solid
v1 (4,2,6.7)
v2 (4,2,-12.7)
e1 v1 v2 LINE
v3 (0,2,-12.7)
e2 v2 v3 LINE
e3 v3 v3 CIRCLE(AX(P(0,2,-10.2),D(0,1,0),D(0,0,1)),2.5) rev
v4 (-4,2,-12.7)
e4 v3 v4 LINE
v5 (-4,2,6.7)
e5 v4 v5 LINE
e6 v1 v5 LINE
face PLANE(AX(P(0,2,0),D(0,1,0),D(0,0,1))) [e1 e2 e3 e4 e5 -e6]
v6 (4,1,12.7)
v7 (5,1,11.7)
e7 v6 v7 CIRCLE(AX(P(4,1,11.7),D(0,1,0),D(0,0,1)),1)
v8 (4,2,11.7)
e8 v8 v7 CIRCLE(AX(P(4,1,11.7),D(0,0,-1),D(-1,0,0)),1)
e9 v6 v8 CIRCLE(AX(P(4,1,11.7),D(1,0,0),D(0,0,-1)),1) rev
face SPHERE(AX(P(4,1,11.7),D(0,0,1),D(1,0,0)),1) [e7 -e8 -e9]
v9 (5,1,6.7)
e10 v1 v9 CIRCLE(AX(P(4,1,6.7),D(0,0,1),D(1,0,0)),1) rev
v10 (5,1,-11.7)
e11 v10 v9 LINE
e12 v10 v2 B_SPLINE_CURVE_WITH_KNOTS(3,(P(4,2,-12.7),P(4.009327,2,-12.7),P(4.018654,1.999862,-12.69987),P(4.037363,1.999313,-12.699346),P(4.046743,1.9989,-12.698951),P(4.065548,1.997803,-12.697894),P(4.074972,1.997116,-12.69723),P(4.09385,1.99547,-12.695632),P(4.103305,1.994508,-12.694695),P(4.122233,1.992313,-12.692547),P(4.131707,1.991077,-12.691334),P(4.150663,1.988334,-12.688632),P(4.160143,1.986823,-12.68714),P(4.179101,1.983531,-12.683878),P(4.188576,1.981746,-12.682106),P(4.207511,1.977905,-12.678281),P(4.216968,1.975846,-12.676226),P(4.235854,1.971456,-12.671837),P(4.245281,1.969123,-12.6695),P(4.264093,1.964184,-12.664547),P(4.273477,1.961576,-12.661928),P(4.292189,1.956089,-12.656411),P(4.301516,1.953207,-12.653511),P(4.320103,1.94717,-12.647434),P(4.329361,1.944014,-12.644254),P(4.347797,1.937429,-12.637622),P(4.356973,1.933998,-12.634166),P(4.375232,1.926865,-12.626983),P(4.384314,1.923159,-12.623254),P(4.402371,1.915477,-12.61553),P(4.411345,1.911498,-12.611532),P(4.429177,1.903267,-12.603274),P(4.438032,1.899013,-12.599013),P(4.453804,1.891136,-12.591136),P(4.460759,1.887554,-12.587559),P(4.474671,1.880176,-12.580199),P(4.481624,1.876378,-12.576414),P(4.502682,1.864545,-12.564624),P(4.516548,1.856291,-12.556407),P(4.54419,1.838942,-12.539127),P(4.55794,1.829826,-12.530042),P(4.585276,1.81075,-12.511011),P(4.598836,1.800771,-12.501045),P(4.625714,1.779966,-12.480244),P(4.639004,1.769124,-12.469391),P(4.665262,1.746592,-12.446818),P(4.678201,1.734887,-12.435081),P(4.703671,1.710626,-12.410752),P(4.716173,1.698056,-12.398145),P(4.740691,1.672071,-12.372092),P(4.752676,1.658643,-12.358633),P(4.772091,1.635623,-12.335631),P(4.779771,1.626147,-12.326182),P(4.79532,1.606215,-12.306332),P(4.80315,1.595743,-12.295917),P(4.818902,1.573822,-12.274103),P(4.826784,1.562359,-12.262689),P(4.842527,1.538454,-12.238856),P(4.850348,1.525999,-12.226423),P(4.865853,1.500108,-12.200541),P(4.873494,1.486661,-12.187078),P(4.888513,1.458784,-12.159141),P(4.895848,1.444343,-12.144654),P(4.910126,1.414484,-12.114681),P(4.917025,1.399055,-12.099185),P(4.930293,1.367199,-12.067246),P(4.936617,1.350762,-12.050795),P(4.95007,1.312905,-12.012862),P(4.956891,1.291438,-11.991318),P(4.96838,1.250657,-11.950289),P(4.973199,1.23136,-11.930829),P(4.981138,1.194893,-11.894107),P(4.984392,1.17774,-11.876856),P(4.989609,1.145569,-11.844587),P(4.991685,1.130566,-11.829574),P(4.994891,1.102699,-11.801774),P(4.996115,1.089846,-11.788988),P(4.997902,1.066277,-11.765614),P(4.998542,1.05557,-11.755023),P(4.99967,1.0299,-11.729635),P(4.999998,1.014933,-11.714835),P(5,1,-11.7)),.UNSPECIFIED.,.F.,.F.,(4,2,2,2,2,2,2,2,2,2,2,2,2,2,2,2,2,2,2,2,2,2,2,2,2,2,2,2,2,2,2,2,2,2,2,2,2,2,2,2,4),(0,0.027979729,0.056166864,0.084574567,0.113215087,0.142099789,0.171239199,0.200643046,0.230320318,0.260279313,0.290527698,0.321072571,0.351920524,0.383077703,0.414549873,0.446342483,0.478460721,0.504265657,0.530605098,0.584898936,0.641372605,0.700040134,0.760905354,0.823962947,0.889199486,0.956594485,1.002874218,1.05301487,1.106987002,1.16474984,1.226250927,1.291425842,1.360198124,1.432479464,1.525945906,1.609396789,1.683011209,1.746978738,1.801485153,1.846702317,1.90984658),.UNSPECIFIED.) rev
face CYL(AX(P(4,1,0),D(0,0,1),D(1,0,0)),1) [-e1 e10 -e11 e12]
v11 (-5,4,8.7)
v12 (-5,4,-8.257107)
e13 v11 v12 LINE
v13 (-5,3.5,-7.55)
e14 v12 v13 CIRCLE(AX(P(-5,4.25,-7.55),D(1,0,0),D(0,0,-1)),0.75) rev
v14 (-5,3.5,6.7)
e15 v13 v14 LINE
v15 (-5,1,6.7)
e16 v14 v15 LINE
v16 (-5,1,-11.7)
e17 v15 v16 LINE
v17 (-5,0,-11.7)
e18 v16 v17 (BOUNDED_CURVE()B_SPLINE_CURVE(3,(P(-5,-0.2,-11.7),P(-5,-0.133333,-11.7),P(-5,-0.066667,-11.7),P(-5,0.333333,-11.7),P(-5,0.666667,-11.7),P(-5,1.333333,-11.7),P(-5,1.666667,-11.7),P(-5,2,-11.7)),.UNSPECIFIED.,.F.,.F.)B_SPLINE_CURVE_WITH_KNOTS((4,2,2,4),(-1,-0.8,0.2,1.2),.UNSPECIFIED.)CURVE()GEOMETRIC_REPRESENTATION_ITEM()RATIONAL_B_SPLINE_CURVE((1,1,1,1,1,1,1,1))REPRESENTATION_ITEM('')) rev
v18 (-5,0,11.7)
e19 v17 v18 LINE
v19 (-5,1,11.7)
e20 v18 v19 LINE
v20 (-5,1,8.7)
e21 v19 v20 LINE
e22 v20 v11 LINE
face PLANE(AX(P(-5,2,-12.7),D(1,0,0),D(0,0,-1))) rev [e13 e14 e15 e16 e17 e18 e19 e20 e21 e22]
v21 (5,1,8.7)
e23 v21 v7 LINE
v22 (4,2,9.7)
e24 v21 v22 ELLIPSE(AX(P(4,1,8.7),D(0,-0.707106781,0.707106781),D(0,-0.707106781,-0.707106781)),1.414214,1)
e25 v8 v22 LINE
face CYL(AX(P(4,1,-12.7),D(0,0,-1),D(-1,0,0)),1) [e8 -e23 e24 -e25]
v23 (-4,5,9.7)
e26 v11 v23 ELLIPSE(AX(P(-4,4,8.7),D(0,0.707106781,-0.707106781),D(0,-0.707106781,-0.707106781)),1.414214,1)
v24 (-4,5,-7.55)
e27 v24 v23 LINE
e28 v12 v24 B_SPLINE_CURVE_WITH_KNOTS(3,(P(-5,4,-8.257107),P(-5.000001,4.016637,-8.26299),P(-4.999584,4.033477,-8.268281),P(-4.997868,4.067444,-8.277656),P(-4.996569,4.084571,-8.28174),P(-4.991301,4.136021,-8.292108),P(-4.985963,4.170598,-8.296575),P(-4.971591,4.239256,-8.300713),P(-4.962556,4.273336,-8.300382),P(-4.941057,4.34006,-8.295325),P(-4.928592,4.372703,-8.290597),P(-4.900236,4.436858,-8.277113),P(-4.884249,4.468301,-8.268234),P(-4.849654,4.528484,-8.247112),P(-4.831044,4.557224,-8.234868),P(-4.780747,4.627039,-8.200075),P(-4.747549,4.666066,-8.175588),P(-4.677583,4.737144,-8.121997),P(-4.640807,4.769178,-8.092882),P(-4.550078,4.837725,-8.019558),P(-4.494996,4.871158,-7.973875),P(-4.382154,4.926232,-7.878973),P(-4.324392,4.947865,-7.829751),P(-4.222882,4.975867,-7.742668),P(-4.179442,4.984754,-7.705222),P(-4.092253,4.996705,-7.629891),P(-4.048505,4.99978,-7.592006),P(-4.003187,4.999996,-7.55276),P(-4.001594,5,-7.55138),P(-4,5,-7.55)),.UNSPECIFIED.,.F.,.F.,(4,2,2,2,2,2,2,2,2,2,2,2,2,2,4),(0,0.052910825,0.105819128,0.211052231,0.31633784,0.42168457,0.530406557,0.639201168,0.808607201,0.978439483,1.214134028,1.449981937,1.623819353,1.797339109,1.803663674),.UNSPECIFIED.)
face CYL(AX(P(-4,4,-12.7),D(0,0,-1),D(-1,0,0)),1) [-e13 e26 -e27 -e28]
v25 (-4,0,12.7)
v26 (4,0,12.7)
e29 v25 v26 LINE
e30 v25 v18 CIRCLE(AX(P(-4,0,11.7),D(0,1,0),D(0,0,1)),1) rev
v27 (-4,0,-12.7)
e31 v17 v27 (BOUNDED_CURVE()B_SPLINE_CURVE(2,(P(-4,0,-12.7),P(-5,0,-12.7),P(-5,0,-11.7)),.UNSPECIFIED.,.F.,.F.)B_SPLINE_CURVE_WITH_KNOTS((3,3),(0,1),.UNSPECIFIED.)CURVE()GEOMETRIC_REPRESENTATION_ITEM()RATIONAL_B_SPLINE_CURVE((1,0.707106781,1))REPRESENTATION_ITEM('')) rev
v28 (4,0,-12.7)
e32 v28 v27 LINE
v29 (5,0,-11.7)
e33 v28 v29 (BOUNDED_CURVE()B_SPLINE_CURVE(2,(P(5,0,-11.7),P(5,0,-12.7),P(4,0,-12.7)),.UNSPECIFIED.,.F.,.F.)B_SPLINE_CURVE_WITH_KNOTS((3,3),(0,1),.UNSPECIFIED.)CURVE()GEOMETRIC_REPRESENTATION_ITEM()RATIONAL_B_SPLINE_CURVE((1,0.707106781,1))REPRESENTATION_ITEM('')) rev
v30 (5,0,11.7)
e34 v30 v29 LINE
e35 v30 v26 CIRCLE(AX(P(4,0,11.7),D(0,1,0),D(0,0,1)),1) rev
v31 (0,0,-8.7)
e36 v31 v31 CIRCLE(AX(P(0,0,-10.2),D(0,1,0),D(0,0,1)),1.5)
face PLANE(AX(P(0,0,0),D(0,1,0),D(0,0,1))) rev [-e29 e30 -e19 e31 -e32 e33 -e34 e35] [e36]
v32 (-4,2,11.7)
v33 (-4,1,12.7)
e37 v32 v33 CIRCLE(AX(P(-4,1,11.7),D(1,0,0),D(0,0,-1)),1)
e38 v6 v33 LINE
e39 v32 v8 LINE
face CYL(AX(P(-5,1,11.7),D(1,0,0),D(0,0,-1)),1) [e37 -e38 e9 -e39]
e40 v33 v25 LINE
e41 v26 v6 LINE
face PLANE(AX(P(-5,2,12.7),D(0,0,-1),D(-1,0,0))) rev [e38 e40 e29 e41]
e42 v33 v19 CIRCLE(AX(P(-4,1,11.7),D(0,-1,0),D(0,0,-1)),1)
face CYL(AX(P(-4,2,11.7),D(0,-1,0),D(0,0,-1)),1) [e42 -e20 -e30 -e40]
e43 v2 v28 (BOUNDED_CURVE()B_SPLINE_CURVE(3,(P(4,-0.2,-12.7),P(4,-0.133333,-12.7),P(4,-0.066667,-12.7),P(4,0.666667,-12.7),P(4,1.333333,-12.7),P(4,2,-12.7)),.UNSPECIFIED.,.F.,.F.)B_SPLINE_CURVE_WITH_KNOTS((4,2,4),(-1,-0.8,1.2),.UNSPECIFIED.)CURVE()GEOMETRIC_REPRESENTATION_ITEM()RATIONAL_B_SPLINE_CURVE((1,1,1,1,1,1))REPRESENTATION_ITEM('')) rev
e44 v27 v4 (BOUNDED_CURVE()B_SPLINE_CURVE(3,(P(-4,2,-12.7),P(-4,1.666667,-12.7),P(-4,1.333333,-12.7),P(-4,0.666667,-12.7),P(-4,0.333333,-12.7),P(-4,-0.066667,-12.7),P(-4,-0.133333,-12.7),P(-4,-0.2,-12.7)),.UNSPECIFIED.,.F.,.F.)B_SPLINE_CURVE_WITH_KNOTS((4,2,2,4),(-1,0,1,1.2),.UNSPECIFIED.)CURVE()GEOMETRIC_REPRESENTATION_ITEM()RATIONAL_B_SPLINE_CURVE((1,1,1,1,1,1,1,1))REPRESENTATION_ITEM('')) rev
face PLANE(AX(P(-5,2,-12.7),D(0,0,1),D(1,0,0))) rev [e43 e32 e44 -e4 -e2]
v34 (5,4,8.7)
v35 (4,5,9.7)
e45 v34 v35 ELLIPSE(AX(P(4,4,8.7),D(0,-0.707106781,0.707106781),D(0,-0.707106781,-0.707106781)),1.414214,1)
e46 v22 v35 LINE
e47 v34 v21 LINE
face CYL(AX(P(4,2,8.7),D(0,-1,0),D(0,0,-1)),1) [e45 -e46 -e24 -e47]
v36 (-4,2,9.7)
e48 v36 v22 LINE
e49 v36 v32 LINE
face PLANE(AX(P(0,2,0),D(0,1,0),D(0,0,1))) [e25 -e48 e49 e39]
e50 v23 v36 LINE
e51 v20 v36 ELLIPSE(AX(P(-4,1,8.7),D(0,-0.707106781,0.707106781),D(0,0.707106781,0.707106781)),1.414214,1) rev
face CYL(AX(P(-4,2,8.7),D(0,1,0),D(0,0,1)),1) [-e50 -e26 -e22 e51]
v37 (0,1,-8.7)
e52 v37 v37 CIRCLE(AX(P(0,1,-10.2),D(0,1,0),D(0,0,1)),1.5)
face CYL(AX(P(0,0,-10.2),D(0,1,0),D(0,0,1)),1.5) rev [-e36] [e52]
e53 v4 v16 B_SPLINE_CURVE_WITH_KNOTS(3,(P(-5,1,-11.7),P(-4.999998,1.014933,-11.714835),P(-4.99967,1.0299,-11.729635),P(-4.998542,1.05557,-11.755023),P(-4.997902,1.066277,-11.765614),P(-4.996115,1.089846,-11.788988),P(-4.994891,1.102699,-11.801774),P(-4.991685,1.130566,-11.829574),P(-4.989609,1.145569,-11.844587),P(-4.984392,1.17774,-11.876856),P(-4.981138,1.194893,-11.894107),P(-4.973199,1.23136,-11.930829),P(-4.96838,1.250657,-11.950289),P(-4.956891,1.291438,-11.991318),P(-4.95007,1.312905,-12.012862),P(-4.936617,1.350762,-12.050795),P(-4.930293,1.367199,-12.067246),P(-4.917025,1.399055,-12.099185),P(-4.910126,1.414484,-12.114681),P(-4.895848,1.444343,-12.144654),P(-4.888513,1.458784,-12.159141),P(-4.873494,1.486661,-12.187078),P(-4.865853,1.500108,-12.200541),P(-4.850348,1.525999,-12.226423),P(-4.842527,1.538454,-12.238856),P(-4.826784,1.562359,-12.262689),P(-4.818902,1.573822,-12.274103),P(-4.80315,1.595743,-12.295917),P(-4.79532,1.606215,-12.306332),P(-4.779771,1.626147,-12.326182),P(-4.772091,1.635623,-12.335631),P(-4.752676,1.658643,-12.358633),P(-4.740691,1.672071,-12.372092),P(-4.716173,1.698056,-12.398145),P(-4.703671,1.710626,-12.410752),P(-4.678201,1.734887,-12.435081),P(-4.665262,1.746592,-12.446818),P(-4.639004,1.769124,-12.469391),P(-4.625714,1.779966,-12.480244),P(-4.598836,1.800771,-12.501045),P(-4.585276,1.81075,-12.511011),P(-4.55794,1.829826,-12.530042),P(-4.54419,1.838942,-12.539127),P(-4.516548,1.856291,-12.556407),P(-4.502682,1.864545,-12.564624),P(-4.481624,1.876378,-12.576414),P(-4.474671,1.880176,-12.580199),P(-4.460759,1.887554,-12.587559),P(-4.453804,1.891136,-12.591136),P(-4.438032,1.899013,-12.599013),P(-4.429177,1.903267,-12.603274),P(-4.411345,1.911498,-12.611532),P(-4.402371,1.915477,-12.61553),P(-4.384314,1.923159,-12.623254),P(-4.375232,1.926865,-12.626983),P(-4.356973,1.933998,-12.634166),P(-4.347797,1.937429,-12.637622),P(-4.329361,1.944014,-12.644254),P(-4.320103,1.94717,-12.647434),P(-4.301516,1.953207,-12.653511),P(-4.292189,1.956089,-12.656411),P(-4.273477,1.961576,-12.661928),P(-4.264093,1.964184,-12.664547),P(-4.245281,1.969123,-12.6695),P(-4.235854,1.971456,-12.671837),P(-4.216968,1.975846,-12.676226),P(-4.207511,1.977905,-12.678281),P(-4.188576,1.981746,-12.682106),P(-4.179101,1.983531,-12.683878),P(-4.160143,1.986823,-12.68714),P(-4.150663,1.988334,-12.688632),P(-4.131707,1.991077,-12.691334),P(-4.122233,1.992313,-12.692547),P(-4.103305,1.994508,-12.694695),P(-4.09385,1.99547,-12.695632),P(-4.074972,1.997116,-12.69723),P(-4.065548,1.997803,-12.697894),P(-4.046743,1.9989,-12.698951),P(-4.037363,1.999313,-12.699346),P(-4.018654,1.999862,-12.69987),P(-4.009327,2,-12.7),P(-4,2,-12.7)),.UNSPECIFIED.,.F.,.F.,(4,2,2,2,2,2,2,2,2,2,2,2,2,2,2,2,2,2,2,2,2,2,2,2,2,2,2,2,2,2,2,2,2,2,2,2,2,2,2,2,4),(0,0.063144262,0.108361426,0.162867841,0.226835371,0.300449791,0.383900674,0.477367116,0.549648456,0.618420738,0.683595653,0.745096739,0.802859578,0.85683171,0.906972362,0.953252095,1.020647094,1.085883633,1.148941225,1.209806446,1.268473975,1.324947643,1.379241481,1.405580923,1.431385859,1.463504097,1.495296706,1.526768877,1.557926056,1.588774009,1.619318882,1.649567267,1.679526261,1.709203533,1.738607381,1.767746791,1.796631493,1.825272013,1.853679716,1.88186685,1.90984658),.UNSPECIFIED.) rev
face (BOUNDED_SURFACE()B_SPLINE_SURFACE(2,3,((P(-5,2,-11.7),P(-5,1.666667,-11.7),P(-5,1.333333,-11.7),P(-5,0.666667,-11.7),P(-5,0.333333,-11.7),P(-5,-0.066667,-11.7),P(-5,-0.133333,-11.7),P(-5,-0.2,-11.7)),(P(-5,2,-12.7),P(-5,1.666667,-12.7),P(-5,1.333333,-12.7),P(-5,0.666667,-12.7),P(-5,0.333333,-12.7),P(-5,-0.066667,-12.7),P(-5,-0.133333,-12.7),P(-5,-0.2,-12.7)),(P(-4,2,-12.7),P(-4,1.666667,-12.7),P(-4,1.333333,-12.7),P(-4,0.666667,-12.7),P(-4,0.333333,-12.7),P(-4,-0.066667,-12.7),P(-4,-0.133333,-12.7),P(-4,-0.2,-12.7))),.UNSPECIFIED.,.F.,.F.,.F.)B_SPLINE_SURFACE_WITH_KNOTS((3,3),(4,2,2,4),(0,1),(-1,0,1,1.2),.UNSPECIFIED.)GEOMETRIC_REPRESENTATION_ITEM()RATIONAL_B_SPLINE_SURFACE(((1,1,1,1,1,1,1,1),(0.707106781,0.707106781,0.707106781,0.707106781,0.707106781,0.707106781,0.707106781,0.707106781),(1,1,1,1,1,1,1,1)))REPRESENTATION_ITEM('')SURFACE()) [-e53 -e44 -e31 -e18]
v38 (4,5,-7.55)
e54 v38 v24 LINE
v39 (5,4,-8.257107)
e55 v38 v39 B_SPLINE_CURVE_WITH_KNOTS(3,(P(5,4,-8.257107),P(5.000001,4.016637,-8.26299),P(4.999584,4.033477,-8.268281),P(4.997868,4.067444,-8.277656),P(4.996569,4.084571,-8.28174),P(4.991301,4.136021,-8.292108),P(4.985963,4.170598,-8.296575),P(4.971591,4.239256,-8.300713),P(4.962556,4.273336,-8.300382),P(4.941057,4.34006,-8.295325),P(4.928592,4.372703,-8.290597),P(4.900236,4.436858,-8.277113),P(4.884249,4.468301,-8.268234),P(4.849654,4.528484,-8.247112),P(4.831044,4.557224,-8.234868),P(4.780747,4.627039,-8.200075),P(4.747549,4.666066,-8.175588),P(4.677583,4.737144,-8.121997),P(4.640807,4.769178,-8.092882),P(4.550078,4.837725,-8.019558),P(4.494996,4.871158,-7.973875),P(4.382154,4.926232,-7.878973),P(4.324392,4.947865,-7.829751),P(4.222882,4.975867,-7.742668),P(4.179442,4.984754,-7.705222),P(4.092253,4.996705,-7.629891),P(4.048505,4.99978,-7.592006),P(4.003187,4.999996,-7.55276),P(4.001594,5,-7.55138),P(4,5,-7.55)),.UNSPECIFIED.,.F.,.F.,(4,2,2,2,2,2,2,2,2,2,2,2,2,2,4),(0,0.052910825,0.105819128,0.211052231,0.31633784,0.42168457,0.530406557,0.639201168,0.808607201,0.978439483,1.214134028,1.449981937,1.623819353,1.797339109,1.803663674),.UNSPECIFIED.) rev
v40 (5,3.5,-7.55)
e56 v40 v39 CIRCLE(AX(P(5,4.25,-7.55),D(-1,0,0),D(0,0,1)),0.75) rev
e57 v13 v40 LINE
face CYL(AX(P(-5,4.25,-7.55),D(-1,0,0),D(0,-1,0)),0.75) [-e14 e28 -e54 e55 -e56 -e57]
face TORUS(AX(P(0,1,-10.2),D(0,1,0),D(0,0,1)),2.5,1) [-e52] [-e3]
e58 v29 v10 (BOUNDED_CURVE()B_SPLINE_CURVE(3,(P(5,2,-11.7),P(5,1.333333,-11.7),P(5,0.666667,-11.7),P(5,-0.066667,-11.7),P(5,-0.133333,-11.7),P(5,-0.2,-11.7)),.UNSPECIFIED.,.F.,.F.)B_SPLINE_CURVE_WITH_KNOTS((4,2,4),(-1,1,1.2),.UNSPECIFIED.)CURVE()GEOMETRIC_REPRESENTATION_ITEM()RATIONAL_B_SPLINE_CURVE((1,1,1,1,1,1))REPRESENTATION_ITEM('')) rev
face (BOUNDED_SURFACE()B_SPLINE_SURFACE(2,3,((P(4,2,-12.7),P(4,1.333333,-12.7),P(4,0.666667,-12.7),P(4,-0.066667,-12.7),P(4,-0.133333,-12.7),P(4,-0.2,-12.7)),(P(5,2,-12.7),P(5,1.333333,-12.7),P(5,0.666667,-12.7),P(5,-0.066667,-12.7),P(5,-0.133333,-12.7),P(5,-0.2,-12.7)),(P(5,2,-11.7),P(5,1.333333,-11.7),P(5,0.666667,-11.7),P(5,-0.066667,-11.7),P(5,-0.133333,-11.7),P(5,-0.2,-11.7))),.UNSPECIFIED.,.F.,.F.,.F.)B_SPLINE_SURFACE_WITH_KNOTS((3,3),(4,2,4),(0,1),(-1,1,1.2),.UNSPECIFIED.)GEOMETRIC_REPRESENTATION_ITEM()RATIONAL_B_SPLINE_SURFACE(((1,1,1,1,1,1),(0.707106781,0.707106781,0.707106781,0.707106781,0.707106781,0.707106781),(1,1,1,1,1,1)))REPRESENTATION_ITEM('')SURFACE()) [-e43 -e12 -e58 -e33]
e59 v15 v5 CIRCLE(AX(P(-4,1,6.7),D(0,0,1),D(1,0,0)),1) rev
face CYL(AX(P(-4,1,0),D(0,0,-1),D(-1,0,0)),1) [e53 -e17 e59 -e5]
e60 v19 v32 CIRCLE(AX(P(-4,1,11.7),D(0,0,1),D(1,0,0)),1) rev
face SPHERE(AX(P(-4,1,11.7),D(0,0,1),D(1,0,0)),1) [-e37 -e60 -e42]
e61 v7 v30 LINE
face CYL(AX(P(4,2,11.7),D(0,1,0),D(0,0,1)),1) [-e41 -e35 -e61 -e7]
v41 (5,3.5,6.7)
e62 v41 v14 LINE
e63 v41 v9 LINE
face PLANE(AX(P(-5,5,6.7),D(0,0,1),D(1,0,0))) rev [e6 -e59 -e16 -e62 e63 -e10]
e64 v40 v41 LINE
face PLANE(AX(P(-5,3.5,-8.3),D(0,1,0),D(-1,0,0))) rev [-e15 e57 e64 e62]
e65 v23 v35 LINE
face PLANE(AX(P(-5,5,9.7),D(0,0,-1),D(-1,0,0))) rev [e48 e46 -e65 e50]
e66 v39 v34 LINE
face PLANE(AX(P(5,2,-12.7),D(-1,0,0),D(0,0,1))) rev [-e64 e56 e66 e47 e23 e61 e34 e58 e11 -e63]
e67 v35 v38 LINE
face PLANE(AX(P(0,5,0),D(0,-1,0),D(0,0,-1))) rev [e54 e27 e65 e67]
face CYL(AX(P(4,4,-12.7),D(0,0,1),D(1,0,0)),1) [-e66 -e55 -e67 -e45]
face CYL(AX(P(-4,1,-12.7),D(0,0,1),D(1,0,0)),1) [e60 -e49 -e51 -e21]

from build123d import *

# Parameters (mm, degrees)
SKETCH1_W           = 10
SKETCH1_H           = 25.4
BOSS_EXTRUDE1_DEPTH = 2
SKETCH3_W           = 10
SKETCH3_H           = 3
BOSS_EXTRUDE3_DEPTH = 3
SKETCH4_W           = 10
SKETCH4_H           = 1.5
BOSS_EXTRUDE4_DEPTH = 15
SKETCH5_R           = 1.5
CUT_EXTRUDE1_DEPTH  = 14.974619852
FILLET2_R           = 1
FILLET4_RADIUS      = 0.75
FILLET4_LENGTH      = 10
FILLET5_R           = 1
FILLET6_R           = 1
FILLET7_R           = 1
FILLET8_START       = -1
FILLET8_DEPTH       = 5
FILLET9_START       = -1
FILLET9_DEPTH       = 4
FILLET10_R          = 1
FILLET11_R          = 1


with BuildPart() as part:
    # Sketch1 → Boss-Extrude1 (new body)
    with BuildSketch(Plane(origin=(0, 0, 0), x_dir=(1, 0, 0), z_dir=(0, 1, 0))):
        Rectangle(SKETCH1_W, SKETCH1_H)
    extrude(amount=BOSS_EXTRUDE1_DEPTH)

    # Sketch3 → Boss-Extrude3 (add)
    with BuildSketch(Plane(origin=(0, 2, 0), x_dir=(1, 0, 0), z_dir=(0, 1, 0))):
        with Locations((0, -8.2)):
            Rectangle(SKETCH3_W, SKETCH3_H)
    extrude(amount=BOSS_EXTRUDE3_DEPTH)

    # Sketch4 → Boss-Extrude4 (add)
    with BuildSketch(Plane(origin=(0, 0, 6.7), x_dir=(-1, 0, 0), z_dir=(0, 0, -1))):
        with Locations((0, 4.25)):
            Rectangle(SKETCH4_W, SKETCH4_H)
    extrude(amount=BOSS_EXTRUDE4_DEPTH)

    # Sketch5 → Cut-Extrude1 (cut, through all)
    with BuildSketch(Plane(origin=(0, 2, 0), x_dir=(1, 0, 0), z_dir=(0, 1, 0))):
        with Locations(Location((0, 10.2, 0), (0, 0, 270))):
            Circle(SKETCH5_R)
    extrude(amount=-CUT_EXTRUDE1_DEPTH, mode=Mode.SUBTRACT)

    # Fillet2
    fillet2_edges = [part.edges().sort_by_distance(p)[0] for p in [
        (0, 2, -11.7),
    ]]
    fillet(fillet2_edges, radius=FILLET2_R - 0.0001)  # a hair under: the kernel refuses the full size

    # Fillet4: full round fillet: the end face becomes a half cylinder, R = half its width
    fillet4_face = Plane((0, 4.25, -8.3), x_dir=(1, 0, 0), z_dir=(0, 0, -1))  # on the end face: x along it, z out of the body
    fillet4_slab = fillet4_face.offset(-FILLET4_RADIUS / 2) * Box(FILLET4_LENGTH, 2 * FILLET4_RADIUS, FILLET4_RADIUS, mode=Mode.PRIVATE)  # the body's end, R deep
    fillet4_round = Plane((0, 4.25, -7.55), x_dir=(0, 0, -1), z_dir=(1, 0, 0)) * Cylinder(FILLET4_RADIUS, FILLET4_LENGTH, mode=Mode.PRIVATE)  # its axis R under the face
    add(fillet4_slab - fillet4_round, mode=Mode.SUBTRACT)

    # Fillet5
    # the kernel refuses this fillet: 1 mm, written as the material it takes off along each edge
    with BuildSketch(Plane(origin=(7.5, 2, 12.7), x_dir=(0, -1, 0), z_dir=(-1, 0, 0))) as fillet5_piece_1:
        with BuildLine():
            CenterArc((FILLET5_R, -FILLET5_R), FILLET5_R, 90, 90)
            Line((0, -FILLET5_R), (0, 0))
            Line((0, 0), (FILLET5_R, 0))
        make_face()
    extrude(amount=15, mode=Mode.SUBTRACT)
    with BuildSketch(Plane(origin=(-5, 2, 15.2), x_dir=(1, 0, 0), z_dir=(0, 0, -1)), Plane(origin=(-5, 2, 9.7), x_dir=(1, 0, 0), z_dir=(0, 1, 0)), Plane(origin=(5, 2, 9.7), x_dir=(0, 0, -1), z_dir=(0, 1, 0))) as fillet5_piece_2:
        with BuildLine():
            CenterArc((FILLET5_R, FILLET5_R), FILLET5_R, 180, 90)
            Line((0, FILLET5_R), (0, 0))
            Line((0, 0), (FILLET5_R, 0))
        make_face()
    extrude(amount=5.5, mode=Mode.SUBTRACT)
    with BuildSketch(Plane(origin=(5, 5, -10.05), x_dir=(0, -1, 0), z_dir=(0, 0, 1))) as fillet5_piece_3:
        with BuildLine():
            CenterArc((FILLET5_R, -FILLET5_R), FILLET5_R, 90, 90)
            Line((0, -FILLET5_R), (0, 0))
            Line((0, 0), (FILLET5_R, 0))
        make_face()
    extrude(amount=22.25, mode=Mode.SUBTRACT)
    with BuildSketch(Plane(origin=(5, 2, 9.7), x_dir=(0, -1, 0), z_dir=(0, 0, 1))) as fillet5_piece_4:
        with BuildLine():
            CenterArc((FILLET5_R, -FILLET5_R), FILLET5_R, 90, 90)
            Line((0, -FILLET5_R), (0, 0))
            Line((0, 0), (FILLET5_R, 0))
        make_face()
    extrude(amount=5.5, mode=Mode.SUBTRACT)
    with BuildSketch(Plane(origin=(-5, 5, 12.2), x_dir=(1, 0, 0), z_dir=(0, 0, -1))) as fillet5_piece_5:
        with BuildLine():
            CenterArc((FILLET5_R, FILLET5_R), FILLET5_R, 180, 90)
            Line((0, FILLET5_R), (0, 0))
            Line((0, 0), (FILLET5_R, 0))
        make_face()
    extrude(amount=22.25, mode=Mode.SUBTRACT)
    with BuildSketch(Plane(origin=(-5, 2, 15.2), x_dir=(1, 0, 0), z_dir=(0, 0, -1))) as fillet5_piece_6a_section:
        with BuildLine():
            CenterArc((FILLET5_R, FILLET5_R), FILLET5_R, 180, 90)
            Line((0, FILLET5_R), (0, 0))
            Line((0, 0), (FILLET5_R, 0))
        make_face()
    fillet5_piece_6a = extrude(amount=8, mode=Mode.PRIVATE)
    fillet5_piece_6a = split(fillet5_piece_6a, bisect_by=Plane(origin=(-5, 2, 9.7), z_dir=(0, 0, -1)), keep=Keep.TOP, mode=Mode.PRIVATE)
    with BuildSketch(Plane(origin=(-5, -0.5, 9.7), x_dir=(1, 0, 0), z_dir=(0, 1, 0))) as fillet5_piece_6b_section:
        with BuildLine():
            CenterArc((FILLET5_R, FILLET5_R), FILLET5_R, 180, 90)
            Line((0, FILLET5_R), (0, 0))
            Line((0, 0), (FILLET5_R, 0))
        make_face()
    fillet5_piece_6b = extrude(amount=8, mode=Mode.PRIVATE)
    fillet5_piece_6b = split(fillet5_piece_6b, bisect_by=Plane(origin=(-5, 2, 9.7), z_dir=(0, -1, 0)), keep=Keep.TOP, mode=Mode.PRIVATE)
    fillet5_piece_6 = fillet5_piece_6a & fillet5_piece_6b
    add(fillet5_piece_6, mode=Mode.SUBTRACT)
    with BuildSketch(Plane(origin=(5, -0.5, 9.7), x_dir=(0, 0, -1), z_dir=(0, 1, 0))) as fillet5_piece_7a_section:
        with BuildLine():
            CenterArc((FILLET5_R, FILLET5_R), FILLET5_R, 180, 90)
            Line((0, FILLET5_R), (0, 0))
            Line((0, 0), (FILLET5_R, 0))
        make_face()
    fillet5_piece_7a = extrude(amount=8, mode=Mode.PRIVATE)
    fillet5_piece_7a = split(fillet5_piece_7a, bisect_by=Plane(origin=(5, 2, 9.7), z_dir=(0, -1, 0)), keep=Keep.TOP, mode=Mode.PRIVATE)
    with BuildSketch(Plane(origin=(5, 2, 7.2), x_dir=(0, -1, 0), z_dir=(0, 0, 1))) as fillet5_piece_7b_section:
        with BuildLine():
            CenterArc((FILLET5_R, -FILLET5_R), FILLET5_R, 90, 90)
            Line((0, -FILLET5_R), (0, 0))
            Line((0, 0), (FILLET5_R, 0))
        make_face()
    fillet5_piece_7b = extrude(amount=8, mode=Mode.PRIVATE)
    fillet5_piece_7b = split(fillet5_piece_7b, bisect_by=Plane(origin=(5, 2, 9.7), z_dir=(0, 0, -1)), keep=Keep.TOP, mode=Mode.PRIVATE)
    fillet5_piece_7 = fillet5_piece_7a & fillet5_piece_7b
    add(fillet5_piece_7, mode=Mode.SUBTRACT)

    # Fillet6
    fillet6_edges = [part.edges().sort_by_distance(p)[0] for p in [
        (-5, 2, -3),
    ]]
    fillet(fillet6_edges, radius=FILLET6_R)

    # Fillet7
    fillet7_edges = [part.edges().sort_by_distance(p)[0] for p in [
        (5, 2, -3),
    ]]
    fillet(fillet7_edges, radius=FILLET7_R)

    # Fillet8: read off the stored shape, not the designer's step
    # Fillet8 outline → Fillet8 (cut)
    with BuildSketch(Plane(origin=(0, 0, 0), x_dir=(1, 0, 0), z_dir=(0, 1, 0)).offset(FILLET8_START)):
        with BuildLine():
            Line((-5, 12.7), (-5, 11.7))
            add(Edge.make_bspline(
                [(-5, 11.7), (-5, 12.7), (-4, 12.7)],
                knots=[0, 0, 0, 1, 1, 1], degree=2, weights=[1, 0.707106781, 1]))
            Line((-4, 12.7), (-5, 12.7))
        make_face()
    extrude(amount=FILLET8_DEPTH, mode=Mode.SUBTRACT)

    # Fillet9: read off the stored shape, not the designer's step
    # Fillet9 outline → Fillet9 (cut)
    with BuildSketch(Plane(origin=(0, 0, 0), x_dir=(1, 0, 0), z_dir=(0, 1, 0)).offset(FILLET9_START)):
        with BuildLine():
            Line((5, 12.7), (4, 12.7))
            add(Edge.make_bspline(
                [(4, 12.7), (5, 12.7), (5, 11.7)],
                knots=[0, 0, 0, 1, 1, 1], degree=2, weights=[1, 0.707106781, 1]))
            Line((5, 11.7), (5, 12.7))
        make_face()
    extrude(amount=FILLET9_DEPTH, mode=Mode.SUBTRACT)

    # Fillet10
    # the kernel refuses this fillet: 1 mm, written as the material it takes off along each edge
    with BuildSketch(Plane(origin=(-4, 1, 11.7), x_dir=(0, 0, 1), z_dir=(-1, 0, 0))) as fillet10_piece_1_section:
        Polygon((0, 0), (FILLET10_R, 0), (FILLET10_R, FILLET10_R), (0, FILLET10_R), align=None)
    fillet10_piece_1 = extrude(amount=FILLET10_R, mode=Mode.PRIVATE)
    fillet10_piece_1 = fillet10_piece_1 - Plane(origin=(-4, 1, 11.7), x_dir=(0, -0.7071067811865475, -0.7071067811865475), z_dir=(-1, 0, 0)) * Sphere(FILLET10_R, mode=Mode.PRIVATE)
    add(fillet10_piece_1, mode=Mode.SUBTRACT)
    with BuildSketch(Plane(origin=(-5, -2.5, 12.7), x_dir=(0, 0, -1), z_dir=(0, 1, 0))) as fillet10_piece_2:
        with BuildLine():
            CenterArc((FILLET10_R, -FILLET10_R), FILLET10_R, 90, 90)
            Line((0, -FILLET10_R), (0, 0))
            Line((0, 0), (FILLET10_R, 0))
        make_face()
    extrude(amount=3.5, mode=Mode.SUBTRACT)

    # Fillet11
    # the kernel refuses this fillet: 1 mm, written as the material it takes off along each edge
    with BuildSketch(Plane(origin=(4, 1, 11.7), x_dir=(0, 0, 1), z_dir=(1, 0, 0))) as fillet11_piece_1_section:
        Polygon((0, 0), (FILLET11_R, 0), (FILLET11_R, -FILLET11_R), (0, -FILLET11_R), align=None)
    fillet11_piece_1 = extrude(amount=FILLET11_R, mode=Mode.PRIVATE)
    fillet11_piece_1 = fillet11_piece_1 - Plane(origin=(4, 1, 11.7), x_dir=(0, -0.7071067811865475, -0.7071067811865475), z_dir=(1, 0, 0)) * Sphere(FILLET11_R, mode=Mode.PRIVATE)
    add(fillet11_piece_1, mode=Mode.SUBTRACT)
    with BuildSketch(Plane(origin=(5, -2.5, 12.7), x_dir=(0, 0, -1), z_dir=(0, 1, 0))) as fillet11_piece_2:
        with BuildLine():
            CenterArc((FILLET11_R, FILLET11_R), FILLET11_R, 180, 90)
            Line((0, FILLET11_R), (0, 0))
            Line((0, 0), (FILLET11_R, 0))
        make_face()
    extrude(amount=3.5, mode=Mode.SUBTRACT)


solid = part.part
